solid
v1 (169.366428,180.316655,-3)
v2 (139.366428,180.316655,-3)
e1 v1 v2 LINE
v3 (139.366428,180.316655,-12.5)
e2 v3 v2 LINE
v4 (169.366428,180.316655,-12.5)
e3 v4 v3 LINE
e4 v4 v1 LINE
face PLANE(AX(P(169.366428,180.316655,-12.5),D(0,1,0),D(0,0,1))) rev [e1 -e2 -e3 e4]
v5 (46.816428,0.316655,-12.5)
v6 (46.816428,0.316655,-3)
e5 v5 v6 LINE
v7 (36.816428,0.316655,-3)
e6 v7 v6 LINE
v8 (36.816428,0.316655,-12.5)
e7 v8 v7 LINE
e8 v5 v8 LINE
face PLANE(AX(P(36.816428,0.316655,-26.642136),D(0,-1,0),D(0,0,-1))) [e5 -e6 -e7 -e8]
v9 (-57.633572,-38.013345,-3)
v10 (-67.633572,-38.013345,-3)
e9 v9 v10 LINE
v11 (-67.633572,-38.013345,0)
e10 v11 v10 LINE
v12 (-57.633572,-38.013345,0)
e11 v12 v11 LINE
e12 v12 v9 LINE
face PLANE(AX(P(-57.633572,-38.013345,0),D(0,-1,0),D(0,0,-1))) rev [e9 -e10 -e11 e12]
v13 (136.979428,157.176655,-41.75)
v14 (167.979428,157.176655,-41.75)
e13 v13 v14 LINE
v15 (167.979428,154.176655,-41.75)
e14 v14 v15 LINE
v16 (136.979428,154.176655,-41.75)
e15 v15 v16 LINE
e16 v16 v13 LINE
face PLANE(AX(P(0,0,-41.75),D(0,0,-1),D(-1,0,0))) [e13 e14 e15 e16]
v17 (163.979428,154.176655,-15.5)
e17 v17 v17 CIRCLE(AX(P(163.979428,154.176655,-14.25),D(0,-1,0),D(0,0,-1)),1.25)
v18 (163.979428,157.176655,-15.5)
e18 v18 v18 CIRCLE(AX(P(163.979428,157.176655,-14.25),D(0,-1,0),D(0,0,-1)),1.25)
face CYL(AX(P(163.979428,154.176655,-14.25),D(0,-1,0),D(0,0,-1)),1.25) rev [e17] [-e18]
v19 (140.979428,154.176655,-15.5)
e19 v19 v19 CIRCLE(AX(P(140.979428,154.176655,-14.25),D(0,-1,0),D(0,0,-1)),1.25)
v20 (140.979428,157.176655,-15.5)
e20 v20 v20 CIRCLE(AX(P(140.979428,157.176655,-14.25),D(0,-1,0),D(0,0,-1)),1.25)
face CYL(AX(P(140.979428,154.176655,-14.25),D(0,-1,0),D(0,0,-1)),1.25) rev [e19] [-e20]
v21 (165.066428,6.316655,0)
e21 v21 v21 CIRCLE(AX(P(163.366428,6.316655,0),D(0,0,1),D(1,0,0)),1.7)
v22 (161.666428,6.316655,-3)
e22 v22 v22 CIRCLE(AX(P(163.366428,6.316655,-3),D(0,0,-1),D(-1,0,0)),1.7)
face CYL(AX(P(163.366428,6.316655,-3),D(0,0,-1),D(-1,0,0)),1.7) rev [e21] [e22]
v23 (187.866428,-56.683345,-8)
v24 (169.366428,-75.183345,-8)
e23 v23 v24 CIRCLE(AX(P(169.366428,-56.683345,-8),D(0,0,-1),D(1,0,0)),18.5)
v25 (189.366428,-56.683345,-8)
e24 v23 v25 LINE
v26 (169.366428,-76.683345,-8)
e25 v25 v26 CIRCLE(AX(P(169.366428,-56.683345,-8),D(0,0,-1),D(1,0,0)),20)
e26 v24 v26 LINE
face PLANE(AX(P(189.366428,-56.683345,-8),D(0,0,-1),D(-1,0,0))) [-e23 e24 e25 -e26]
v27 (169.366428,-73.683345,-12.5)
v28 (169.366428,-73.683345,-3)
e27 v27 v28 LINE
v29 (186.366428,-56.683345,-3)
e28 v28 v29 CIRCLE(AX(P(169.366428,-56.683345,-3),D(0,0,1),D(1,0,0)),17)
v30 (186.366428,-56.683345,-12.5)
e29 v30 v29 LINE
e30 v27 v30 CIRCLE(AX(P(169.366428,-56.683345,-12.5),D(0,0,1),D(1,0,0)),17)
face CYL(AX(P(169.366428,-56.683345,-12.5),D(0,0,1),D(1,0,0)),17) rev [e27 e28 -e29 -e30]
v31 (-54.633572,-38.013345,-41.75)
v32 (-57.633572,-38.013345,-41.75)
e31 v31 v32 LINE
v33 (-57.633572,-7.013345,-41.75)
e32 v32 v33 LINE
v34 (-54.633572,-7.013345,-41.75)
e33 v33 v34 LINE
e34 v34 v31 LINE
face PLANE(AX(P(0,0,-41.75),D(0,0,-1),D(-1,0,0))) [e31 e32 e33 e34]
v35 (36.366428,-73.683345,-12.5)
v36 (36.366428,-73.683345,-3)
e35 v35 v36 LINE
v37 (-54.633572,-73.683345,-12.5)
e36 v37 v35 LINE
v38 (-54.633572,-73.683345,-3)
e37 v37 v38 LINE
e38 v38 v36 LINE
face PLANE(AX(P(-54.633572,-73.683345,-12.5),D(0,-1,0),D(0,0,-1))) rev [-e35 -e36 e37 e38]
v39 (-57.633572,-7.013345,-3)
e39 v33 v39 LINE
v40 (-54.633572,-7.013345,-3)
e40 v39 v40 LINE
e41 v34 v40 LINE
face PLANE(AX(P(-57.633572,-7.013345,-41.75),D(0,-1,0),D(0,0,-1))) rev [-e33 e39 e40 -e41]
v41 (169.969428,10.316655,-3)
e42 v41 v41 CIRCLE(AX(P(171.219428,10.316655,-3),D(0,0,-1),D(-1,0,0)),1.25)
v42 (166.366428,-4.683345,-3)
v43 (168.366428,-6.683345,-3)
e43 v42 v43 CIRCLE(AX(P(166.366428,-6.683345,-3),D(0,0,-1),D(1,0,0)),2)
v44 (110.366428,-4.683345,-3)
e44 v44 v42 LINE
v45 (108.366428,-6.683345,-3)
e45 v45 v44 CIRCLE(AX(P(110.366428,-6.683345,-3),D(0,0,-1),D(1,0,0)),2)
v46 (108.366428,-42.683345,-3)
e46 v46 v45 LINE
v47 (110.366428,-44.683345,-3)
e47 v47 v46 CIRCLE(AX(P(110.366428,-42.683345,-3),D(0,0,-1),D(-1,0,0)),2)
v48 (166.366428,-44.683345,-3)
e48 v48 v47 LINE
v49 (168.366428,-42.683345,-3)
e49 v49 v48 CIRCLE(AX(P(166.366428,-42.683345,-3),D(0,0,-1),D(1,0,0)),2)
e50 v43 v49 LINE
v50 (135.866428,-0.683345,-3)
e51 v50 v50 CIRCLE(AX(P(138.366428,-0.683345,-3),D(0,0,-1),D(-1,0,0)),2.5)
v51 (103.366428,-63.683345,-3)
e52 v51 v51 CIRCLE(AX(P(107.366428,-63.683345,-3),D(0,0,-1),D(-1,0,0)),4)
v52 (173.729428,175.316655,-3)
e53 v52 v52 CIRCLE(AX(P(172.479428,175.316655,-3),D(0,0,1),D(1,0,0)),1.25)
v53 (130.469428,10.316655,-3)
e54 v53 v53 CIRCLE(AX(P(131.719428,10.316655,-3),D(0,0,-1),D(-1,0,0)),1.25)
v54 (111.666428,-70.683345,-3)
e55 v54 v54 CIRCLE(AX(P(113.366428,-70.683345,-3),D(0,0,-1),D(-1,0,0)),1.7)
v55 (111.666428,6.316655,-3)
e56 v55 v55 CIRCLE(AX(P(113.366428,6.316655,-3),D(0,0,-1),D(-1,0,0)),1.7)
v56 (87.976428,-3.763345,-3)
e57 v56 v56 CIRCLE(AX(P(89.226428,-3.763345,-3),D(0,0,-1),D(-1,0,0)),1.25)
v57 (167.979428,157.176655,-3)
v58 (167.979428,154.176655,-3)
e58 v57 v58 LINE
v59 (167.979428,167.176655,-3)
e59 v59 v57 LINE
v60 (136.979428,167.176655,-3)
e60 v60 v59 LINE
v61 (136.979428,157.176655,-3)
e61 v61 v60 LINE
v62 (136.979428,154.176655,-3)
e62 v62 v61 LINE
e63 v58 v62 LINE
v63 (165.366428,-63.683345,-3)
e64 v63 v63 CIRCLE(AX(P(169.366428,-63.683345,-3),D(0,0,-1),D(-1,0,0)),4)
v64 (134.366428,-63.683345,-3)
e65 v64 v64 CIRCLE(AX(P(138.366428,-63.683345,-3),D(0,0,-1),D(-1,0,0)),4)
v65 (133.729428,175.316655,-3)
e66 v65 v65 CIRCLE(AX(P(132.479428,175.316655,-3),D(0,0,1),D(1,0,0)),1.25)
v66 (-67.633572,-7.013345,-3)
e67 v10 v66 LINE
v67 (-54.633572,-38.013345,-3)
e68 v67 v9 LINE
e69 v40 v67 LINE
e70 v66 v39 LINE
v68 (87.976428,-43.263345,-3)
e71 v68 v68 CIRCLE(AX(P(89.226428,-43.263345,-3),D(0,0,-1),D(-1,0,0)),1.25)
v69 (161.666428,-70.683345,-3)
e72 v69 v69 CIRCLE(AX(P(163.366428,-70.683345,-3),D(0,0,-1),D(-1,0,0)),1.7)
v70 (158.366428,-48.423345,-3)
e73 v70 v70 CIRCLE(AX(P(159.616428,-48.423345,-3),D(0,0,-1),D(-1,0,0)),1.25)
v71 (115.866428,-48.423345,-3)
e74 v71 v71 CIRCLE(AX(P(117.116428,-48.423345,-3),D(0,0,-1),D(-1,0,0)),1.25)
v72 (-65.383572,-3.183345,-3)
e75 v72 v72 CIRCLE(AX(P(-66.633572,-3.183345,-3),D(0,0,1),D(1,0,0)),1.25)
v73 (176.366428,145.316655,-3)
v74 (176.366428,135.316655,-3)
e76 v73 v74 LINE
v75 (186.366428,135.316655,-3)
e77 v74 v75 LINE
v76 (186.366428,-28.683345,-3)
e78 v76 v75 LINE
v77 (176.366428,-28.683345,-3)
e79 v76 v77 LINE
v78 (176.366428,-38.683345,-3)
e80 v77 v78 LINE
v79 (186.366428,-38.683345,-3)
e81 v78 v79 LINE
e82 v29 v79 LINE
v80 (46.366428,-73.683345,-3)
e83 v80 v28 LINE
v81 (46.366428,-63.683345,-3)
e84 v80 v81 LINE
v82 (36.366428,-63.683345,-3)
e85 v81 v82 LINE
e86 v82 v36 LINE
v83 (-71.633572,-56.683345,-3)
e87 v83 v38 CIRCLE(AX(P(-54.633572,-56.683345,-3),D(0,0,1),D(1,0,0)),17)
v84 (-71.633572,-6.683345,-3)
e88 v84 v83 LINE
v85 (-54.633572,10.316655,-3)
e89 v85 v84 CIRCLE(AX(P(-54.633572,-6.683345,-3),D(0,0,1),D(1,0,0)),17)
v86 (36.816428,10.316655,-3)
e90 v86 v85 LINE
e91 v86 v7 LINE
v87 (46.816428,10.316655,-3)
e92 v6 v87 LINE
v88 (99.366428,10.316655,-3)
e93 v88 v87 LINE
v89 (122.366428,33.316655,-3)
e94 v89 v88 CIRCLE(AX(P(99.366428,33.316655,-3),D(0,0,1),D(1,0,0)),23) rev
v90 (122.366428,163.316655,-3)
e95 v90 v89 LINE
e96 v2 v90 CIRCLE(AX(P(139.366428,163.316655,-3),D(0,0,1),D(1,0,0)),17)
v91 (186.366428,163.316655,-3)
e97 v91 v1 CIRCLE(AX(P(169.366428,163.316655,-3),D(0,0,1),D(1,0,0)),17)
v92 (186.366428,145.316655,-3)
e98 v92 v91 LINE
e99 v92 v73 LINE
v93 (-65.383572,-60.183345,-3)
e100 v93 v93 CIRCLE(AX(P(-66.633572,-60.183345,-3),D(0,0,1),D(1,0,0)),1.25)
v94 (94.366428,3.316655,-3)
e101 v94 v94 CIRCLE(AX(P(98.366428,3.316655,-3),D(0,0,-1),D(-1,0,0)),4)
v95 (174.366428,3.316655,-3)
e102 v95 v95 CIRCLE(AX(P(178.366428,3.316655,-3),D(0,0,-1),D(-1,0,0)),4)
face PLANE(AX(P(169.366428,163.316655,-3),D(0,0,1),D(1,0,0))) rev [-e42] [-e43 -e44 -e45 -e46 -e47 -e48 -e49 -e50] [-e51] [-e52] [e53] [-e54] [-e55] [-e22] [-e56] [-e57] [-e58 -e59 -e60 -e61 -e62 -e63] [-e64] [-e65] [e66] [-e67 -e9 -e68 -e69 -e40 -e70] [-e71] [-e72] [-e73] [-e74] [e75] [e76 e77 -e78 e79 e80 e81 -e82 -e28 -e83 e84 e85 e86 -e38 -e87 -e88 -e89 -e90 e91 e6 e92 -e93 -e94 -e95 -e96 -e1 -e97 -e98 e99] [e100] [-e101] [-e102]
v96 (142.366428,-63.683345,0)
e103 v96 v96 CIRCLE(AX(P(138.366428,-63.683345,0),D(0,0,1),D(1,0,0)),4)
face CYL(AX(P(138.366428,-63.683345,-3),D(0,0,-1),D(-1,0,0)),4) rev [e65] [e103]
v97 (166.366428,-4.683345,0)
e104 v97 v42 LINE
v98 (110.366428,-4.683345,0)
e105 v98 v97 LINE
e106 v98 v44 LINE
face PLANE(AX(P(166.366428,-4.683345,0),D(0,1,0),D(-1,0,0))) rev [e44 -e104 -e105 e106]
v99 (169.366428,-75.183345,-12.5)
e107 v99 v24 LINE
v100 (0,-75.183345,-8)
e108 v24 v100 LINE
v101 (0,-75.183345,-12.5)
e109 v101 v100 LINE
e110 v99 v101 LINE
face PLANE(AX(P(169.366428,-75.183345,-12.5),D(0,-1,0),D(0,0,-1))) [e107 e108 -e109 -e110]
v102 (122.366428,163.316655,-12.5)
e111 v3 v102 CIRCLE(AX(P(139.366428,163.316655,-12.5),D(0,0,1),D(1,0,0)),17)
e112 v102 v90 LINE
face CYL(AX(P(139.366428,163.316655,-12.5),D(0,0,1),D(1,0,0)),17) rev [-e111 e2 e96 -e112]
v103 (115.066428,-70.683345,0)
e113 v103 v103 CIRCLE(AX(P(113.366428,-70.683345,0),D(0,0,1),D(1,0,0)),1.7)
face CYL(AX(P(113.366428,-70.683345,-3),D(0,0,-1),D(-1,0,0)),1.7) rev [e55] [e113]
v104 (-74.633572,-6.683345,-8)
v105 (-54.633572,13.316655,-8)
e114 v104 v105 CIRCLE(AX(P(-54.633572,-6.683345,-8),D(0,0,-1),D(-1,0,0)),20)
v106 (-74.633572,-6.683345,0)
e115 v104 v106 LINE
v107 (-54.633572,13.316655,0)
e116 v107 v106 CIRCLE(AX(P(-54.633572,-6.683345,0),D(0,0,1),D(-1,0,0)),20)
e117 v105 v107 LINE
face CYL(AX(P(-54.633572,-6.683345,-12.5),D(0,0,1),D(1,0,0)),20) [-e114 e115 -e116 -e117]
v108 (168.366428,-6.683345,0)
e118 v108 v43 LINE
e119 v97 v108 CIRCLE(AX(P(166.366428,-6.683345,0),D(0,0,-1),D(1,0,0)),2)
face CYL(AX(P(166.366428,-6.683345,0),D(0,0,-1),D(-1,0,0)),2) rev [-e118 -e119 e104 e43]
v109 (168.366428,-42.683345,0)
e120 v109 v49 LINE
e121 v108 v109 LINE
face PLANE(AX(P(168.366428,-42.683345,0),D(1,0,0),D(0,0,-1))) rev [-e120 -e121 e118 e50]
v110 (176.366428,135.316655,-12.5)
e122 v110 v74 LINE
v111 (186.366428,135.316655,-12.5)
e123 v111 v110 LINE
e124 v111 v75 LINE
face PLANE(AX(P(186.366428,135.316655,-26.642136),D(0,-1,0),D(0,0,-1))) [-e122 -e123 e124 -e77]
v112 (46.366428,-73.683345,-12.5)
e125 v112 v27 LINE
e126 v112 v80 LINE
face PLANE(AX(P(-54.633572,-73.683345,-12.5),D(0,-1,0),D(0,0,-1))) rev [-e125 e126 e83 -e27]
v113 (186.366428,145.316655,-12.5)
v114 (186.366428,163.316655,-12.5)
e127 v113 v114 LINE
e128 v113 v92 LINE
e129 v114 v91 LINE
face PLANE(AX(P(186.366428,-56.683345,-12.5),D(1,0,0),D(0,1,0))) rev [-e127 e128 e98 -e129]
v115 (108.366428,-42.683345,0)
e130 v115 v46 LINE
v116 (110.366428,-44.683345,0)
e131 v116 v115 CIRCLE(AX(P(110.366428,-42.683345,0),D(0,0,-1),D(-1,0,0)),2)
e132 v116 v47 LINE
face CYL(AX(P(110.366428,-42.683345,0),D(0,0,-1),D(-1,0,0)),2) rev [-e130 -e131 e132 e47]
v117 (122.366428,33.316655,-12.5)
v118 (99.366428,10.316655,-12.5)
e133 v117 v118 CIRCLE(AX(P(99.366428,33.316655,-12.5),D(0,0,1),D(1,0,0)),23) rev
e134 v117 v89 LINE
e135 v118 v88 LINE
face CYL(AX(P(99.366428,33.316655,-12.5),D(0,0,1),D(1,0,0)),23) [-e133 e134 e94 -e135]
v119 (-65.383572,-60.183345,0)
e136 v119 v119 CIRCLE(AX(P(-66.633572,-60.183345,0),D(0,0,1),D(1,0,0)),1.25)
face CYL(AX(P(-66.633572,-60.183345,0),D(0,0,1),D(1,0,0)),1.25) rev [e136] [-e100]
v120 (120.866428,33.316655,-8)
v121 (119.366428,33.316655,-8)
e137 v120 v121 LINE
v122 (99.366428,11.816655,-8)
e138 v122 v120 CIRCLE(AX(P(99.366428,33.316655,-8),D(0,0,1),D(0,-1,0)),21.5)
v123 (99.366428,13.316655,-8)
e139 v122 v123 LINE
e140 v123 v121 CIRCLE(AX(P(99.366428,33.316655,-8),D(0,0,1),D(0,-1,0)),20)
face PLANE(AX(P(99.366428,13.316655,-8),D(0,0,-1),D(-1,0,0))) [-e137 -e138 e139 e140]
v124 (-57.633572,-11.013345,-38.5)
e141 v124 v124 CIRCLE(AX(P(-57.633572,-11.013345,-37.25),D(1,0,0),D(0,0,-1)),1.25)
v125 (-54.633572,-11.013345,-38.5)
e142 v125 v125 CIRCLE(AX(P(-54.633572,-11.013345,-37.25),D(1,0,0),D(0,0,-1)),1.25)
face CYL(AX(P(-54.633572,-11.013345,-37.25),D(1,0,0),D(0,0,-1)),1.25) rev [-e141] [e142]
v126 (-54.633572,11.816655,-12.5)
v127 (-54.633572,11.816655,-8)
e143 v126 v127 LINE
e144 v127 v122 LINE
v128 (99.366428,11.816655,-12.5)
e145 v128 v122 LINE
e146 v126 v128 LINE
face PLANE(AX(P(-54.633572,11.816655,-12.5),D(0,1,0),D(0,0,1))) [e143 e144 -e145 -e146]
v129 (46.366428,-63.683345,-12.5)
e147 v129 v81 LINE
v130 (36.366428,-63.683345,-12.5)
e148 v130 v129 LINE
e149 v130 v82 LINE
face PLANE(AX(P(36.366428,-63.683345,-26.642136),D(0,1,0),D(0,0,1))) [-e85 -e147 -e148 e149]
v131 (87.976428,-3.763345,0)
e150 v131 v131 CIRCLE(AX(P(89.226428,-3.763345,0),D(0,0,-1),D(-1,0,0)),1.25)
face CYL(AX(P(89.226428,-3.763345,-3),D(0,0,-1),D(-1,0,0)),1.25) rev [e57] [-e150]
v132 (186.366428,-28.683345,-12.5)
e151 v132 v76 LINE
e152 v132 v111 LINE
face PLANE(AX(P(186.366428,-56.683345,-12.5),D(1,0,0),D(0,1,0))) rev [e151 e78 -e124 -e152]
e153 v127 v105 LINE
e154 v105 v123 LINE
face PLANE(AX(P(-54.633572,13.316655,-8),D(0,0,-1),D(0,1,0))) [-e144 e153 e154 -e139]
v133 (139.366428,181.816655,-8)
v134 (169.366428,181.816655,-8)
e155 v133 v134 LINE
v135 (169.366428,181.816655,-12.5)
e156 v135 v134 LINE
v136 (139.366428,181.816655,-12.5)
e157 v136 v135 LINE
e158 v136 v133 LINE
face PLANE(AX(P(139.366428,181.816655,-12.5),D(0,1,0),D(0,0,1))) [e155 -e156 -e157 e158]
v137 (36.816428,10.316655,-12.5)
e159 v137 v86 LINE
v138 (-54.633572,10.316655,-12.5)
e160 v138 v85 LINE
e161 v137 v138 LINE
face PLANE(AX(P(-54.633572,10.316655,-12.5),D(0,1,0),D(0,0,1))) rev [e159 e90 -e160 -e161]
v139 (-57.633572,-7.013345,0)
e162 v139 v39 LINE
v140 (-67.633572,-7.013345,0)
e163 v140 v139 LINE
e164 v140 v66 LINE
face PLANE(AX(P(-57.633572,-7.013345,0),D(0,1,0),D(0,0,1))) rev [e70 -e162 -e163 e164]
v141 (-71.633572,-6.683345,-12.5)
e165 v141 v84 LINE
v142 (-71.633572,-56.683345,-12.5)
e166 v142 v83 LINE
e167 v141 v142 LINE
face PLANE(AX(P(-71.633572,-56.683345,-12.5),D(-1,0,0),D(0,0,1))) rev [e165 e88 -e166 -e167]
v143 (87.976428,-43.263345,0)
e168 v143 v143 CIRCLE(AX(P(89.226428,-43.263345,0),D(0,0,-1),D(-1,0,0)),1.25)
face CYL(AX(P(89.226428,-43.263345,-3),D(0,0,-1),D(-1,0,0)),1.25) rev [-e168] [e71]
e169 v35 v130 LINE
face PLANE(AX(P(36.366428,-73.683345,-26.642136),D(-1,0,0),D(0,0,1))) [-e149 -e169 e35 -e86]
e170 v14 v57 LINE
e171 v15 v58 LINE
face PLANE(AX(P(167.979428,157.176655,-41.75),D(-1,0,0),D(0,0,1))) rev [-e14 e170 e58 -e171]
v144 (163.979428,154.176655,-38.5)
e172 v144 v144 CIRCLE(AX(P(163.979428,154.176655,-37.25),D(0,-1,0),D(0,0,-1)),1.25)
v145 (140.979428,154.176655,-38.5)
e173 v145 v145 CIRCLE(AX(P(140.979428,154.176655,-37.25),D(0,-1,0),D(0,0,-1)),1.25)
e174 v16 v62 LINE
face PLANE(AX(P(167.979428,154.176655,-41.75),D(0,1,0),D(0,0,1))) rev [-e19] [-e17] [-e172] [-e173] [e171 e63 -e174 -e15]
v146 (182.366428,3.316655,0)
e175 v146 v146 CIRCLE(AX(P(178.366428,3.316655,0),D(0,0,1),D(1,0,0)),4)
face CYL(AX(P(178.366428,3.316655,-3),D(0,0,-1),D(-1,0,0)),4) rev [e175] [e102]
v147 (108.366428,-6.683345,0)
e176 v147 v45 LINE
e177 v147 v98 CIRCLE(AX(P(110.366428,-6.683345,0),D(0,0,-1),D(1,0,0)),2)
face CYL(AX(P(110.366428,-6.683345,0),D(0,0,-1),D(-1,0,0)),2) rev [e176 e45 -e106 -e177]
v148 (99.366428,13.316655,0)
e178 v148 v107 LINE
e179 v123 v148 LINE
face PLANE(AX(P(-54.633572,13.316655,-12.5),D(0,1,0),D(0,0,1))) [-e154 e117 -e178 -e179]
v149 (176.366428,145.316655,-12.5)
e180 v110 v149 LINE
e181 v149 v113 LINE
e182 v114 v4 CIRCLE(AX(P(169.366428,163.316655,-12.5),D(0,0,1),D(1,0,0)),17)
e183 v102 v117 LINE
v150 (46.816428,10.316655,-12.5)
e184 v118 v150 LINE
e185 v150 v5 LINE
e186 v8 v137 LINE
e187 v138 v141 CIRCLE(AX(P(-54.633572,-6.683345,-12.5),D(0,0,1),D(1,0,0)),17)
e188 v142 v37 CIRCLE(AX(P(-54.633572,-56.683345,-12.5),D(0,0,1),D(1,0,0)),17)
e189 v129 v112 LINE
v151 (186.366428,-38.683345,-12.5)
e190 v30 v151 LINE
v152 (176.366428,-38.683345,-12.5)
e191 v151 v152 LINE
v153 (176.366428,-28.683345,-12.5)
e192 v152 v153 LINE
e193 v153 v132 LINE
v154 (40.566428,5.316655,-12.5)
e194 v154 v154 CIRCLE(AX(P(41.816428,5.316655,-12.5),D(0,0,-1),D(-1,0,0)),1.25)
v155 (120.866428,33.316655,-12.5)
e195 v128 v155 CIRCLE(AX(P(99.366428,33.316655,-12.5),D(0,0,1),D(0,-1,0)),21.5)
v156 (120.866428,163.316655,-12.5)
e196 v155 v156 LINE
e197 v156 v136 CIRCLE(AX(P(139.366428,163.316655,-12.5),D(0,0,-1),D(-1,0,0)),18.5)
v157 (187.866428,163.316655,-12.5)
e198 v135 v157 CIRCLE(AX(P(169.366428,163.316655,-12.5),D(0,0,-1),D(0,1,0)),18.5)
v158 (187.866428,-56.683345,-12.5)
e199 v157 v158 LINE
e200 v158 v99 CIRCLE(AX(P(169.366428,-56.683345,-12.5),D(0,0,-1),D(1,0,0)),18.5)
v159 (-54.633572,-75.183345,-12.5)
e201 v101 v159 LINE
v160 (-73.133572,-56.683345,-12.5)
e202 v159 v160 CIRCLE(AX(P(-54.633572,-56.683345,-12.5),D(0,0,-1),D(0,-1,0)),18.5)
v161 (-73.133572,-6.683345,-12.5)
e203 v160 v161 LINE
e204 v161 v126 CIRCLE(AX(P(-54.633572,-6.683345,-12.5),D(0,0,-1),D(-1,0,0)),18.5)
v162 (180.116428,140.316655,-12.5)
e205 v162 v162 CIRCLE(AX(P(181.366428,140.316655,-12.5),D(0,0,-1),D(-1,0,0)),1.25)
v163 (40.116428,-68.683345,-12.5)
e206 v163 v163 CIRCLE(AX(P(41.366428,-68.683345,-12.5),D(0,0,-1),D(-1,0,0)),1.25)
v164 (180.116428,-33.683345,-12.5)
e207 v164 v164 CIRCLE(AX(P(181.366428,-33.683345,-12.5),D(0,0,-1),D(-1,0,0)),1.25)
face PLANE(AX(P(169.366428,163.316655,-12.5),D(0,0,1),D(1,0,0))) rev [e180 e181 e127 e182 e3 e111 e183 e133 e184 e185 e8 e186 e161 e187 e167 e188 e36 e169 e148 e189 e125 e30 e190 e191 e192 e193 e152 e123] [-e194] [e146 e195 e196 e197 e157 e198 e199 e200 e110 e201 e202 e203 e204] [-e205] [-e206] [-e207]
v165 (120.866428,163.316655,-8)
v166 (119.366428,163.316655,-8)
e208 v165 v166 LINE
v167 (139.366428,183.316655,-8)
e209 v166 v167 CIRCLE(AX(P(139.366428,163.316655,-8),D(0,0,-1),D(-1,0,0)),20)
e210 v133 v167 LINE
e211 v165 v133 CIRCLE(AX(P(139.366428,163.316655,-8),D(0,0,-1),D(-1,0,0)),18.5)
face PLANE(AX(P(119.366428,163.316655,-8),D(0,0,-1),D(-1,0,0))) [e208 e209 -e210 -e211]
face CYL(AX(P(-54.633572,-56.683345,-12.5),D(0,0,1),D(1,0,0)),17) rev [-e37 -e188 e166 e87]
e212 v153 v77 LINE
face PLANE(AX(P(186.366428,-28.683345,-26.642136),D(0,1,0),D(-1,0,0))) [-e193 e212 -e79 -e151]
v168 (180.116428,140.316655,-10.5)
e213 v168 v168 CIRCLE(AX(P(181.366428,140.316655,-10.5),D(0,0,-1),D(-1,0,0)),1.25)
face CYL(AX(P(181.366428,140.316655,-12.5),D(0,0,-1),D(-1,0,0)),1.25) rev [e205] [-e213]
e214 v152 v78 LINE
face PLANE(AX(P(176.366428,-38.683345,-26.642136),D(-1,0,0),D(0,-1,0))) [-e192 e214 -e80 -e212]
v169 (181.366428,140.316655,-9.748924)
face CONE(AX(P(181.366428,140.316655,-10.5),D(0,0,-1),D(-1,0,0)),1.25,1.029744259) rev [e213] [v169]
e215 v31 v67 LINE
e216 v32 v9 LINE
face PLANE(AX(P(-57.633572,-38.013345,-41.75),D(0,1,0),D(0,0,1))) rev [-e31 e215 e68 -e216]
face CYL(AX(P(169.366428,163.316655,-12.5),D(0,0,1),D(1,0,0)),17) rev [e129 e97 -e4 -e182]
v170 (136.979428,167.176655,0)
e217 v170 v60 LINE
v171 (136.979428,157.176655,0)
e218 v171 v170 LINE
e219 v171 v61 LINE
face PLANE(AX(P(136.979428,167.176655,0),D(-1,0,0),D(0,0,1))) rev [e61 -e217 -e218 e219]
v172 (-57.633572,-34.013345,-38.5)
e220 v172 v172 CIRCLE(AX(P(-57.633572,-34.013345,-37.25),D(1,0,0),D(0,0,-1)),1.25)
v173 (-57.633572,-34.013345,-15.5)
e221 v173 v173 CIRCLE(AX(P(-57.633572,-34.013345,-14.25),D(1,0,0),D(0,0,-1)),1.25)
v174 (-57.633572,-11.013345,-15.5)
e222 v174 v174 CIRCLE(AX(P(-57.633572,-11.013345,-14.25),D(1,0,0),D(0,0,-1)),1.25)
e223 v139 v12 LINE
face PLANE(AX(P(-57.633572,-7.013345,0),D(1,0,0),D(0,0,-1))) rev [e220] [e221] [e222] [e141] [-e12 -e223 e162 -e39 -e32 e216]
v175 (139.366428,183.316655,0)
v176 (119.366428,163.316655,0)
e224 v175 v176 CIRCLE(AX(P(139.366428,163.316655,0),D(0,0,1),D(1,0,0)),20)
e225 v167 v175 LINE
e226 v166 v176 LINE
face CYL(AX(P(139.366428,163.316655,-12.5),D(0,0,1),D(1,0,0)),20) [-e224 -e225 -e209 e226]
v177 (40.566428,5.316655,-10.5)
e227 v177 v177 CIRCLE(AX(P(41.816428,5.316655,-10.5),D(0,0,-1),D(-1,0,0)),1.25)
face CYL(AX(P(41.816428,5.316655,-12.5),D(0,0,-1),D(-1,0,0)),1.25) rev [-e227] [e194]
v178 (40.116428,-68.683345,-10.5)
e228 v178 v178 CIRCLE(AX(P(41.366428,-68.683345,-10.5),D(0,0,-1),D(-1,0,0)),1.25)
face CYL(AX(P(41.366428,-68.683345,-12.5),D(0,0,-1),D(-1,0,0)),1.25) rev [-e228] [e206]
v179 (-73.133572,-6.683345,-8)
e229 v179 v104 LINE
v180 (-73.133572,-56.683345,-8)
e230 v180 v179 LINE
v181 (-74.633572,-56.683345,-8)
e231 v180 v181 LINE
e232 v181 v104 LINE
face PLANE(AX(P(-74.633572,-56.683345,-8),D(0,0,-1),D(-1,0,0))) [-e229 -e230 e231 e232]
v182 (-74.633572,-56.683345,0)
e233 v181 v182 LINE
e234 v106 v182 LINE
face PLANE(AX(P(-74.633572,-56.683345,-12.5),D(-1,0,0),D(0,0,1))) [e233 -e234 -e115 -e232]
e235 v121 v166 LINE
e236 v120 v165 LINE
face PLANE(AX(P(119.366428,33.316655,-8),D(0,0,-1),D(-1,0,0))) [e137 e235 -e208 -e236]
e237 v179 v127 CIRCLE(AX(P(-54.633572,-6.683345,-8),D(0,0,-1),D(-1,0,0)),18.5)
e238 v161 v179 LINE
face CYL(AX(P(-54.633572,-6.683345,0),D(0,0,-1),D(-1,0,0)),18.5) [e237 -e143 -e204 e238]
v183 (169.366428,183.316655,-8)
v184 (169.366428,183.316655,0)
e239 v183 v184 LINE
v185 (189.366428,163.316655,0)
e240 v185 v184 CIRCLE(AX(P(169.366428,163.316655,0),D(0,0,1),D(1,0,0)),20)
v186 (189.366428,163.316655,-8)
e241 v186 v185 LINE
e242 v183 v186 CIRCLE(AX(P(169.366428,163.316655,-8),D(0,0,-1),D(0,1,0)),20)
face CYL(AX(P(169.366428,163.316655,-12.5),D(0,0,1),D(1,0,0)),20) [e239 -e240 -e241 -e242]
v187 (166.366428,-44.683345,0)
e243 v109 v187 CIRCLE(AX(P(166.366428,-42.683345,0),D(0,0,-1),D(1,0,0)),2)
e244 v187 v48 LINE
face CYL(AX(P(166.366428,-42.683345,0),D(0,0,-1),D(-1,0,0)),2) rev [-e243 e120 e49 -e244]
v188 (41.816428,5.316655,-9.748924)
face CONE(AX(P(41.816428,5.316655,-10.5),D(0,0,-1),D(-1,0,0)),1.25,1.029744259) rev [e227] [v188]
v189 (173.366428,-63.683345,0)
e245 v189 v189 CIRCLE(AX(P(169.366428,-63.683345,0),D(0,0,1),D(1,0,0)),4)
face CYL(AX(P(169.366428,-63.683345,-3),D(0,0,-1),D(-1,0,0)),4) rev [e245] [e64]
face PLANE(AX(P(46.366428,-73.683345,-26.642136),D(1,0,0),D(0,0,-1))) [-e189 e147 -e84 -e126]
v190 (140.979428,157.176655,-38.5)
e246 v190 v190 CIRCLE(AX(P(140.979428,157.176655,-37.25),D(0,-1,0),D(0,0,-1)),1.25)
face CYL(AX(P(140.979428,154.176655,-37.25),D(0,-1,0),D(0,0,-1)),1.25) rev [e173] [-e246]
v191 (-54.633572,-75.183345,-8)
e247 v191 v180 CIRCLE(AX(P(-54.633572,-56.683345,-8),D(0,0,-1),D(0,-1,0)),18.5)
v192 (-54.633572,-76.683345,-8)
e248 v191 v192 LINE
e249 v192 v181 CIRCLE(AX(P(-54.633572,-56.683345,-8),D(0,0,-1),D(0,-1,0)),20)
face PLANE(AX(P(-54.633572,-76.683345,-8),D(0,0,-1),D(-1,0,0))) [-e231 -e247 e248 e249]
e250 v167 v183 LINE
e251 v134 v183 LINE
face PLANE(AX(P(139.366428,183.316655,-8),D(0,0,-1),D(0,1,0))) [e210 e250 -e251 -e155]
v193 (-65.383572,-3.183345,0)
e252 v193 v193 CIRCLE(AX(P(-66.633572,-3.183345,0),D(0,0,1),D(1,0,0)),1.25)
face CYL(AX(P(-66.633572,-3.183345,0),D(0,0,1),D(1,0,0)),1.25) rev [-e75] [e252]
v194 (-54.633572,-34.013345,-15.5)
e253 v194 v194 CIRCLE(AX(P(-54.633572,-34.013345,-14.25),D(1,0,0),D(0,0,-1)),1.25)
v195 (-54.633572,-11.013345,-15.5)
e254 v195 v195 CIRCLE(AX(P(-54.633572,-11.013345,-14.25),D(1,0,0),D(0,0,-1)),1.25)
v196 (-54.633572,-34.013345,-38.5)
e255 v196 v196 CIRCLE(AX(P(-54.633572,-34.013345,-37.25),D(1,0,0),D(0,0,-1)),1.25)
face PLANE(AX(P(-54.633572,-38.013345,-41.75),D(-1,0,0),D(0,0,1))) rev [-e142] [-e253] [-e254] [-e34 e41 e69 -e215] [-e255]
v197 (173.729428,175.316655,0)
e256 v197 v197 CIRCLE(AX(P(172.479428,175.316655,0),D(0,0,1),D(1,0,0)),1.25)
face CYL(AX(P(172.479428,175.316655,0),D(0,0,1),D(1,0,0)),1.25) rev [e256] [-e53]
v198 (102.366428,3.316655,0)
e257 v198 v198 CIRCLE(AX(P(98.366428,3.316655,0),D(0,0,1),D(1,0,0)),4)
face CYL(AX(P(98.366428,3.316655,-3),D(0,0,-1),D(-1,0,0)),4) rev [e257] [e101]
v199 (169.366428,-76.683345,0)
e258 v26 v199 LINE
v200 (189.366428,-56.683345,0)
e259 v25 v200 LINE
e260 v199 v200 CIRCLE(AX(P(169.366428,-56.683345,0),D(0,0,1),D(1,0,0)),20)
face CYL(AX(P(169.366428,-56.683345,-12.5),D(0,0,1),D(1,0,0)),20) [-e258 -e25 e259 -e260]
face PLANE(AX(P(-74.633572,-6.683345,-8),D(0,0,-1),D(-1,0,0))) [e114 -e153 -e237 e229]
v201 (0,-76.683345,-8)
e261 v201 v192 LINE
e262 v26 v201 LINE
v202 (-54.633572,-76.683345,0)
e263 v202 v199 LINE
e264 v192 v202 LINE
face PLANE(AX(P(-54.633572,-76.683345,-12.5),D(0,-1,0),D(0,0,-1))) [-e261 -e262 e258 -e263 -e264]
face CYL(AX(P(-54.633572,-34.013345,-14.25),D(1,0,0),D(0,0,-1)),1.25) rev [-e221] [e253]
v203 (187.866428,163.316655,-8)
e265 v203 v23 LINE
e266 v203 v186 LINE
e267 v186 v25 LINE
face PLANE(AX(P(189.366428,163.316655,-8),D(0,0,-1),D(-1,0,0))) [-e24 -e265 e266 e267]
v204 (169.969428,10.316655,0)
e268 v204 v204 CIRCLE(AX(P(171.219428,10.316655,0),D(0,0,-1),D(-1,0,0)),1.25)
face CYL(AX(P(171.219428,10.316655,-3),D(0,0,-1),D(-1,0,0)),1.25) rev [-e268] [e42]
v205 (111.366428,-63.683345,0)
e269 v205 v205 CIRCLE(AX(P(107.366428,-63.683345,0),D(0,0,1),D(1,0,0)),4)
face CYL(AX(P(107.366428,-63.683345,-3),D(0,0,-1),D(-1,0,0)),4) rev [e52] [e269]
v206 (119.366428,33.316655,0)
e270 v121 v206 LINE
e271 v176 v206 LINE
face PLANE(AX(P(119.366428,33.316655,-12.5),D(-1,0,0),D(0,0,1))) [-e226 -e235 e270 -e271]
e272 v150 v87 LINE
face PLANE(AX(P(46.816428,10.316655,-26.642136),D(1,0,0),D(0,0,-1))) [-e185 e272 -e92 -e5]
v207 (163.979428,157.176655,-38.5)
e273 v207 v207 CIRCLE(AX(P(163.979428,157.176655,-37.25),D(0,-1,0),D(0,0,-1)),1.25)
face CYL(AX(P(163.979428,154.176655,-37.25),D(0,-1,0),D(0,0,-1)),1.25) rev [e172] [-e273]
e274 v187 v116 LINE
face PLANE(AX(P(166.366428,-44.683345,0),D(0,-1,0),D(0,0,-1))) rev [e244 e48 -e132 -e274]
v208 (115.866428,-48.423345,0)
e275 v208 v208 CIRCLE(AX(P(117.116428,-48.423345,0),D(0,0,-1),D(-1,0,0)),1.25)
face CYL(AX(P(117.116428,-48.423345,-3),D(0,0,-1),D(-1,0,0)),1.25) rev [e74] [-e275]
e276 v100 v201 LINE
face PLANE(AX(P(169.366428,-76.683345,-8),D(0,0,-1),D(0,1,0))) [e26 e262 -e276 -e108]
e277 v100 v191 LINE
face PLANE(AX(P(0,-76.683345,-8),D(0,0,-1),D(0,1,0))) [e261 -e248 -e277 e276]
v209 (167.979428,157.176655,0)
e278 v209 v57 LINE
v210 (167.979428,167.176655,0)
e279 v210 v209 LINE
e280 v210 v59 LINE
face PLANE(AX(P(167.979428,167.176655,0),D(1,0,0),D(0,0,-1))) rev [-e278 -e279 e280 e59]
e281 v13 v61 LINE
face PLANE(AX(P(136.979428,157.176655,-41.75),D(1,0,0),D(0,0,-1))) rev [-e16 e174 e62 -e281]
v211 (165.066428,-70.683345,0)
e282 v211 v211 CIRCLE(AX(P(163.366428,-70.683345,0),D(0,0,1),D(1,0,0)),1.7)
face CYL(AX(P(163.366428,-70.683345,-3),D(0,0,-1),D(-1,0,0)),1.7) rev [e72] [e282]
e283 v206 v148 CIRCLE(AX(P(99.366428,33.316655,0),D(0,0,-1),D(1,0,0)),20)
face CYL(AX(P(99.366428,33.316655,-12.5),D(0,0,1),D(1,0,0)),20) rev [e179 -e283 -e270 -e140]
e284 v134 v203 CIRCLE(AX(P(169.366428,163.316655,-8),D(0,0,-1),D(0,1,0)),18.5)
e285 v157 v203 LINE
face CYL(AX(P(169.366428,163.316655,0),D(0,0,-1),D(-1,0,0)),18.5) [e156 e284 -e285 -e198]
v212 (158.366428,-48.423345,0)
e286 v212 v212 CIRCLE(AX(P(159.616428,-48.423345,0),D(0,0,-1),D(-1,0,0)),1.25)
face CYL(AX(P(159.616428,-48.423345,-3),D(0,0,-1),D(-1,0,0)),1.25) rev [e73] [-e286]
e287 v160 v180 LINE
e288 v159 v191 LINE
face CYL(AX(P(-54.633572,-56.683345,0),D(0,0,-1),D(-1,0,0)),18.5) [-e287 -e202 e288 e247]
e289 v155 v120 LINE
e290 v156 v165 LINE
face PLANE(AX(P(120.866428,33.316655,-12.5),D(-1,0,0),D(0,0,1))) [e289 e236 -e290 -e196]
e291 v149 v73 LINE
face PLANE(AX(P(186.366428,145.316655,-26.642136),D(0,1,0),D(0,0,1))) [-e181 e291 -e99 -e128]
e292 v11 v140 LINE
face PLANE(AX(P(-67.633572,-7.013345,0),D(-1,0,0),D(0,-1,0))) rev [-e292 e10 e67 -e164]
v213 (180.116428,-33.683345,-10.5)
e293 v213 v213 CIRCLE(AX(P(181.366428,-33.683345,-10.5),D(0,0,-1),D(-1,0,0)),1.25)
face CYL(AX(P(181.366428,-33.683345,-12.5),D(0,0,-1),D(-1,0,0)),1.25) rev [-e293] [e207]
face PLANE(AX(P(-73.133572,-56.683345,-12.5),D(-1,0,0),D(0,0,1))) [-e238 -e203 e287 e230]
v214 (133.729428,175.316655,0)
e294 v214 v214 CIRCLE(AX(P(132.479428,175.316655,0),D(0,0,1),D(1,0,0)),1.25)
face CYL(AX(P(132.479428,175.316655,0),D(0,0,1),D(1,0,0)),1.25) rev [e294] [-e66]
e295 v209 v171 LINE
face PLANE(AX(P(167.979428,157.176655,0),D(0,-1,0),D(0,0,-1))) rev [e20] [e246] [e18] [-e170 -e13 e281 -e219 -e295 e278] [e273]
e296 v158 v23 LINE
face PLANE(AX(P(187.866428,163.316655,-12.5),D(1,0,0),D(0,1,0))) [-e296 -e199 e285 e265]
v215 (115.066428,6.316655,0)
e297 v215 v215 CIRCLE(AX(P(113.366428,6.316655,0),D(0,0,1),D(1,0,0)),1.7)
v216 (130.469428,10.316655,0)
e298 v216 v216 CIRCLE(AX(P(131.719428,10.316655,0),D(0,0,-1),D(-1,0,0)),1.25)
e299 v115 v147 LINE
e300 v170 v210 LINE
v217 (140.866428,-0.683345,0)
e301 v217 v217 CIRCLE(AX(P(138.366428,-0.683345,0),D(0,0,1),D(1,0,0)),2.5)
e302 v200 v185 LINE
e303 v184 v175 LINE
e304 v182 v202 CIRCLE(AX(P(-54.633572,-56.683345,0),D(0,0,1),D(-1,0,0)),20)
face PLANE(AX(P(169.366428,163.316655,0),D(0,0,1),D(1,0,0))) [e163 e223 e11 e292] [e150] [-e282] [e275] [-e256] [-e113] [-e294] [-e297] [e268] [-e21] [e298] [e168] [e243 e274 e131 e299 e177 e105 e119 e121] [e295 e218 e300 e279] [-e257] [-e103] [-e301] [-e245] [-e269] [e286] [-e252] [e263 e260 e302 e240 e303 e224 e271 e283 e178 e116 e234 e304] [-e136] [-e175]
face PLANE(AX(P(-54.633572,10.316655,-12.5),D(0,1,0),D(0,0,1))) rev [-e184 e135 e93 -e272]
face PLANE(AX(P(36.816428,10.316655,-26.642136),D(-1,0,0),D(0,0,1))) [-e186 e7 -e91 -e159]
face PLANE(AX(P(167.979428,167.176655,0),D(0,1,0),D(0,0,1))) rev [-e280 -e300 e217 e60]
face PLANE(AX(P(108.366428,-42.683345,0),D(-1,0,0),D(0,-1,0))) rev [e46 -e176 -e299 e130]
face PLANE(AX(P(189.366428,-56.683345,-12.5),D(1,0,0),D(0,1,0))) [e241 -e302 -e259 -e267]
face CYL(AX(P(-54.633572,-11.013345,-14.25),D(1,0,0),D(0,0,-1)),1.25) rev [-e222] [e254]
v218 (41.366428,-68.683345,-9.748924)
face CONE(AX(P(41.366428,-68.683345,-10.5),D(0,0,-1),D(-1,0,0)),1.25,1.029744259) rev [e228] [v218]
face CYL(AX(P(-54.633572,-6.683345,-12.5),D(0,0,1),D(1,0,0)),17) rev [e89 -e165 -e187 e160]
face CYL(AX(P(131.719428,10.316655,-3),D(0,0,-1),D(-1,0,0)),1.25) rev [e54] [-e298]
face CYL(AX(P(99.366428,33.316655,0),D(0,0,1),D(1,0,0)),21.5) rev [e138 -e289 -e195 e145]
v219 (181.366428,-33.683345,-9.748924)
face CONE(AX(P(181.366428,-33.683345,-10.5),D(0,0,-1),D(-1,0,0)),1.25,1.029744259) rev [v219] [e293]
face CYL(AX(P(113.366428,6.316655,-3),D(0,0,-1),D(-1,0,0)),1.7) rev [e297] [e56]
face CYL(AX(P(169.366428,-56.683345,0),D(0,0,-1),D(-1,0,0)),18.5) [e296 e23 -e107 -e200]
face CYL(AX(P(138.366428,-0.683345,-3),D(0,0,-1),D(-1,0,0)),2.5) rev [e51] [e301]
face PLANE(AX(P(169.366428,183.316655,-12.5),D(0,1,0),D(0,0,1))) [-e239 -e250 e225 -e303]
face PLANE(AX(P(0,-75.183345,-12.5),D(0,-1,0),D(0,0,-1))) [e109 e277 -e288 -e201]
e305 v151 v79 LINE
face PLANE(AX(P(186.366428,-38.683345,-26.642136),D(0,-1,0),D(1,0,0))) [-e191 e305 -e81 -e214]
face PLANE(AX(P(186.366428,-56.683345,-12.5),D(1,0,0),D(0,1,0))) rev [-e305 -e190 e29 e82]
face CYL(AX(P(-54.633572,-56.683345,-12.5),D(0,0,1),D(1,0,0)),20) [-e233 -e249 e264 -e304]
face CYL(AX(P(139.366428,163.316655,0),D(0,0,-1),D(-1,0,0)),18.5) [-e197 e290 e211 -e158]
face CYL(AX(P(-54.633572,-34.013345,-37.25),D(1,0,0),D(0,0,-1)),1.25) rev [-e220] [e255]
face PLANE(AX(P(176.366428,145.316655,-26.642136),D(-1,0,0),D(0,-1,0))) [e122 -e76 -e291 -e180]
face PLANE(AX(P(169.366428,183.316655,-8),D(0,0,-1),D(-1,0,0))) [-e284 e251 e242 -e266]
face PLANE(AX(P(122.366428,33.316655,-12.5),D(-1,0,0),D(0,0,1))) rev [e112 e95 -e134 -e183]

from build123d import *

# Parameters (mm, degrees)
BOX_EXTRUDE_DEPTH                 = 12.5
SHELL1_T                          = -3
CUT_SWEEP_START                   = -12.5
CUT_SWEEP_DEPTH                   = 4.5
SKETCH2_W                         = 10
SKETCH2_H                         = 10
SQUARES_EXTRUDE_DEPTH             = 9.5
SKETCH11_W                        = 10
SKETCH11_H                        = 31
SKETCH11_W_2                      = 31
SKETCH11_H_2                      = 10
CUT_EXTRUDE2_DEPTH                = 264.732611064
SQUARES_M3_CLEARANCE_HOLES_D      = 2.5
SQUARES_M3_CLEARANCE_HOLES_DEPTH  = 2
SQUARES_M3_CLEARANCE_HOLES_TIP    = 0.751075774
F_8_0MM_DOWEL_HOLE1_D             = 8
F_8_0MM_DOWEL_HOLE1_DEPTH         = 7.5
F_8_0MM_DOWEL_HOLE1_TIP           = 2.403442476
F_5_0MM_DOWEL_HOLE1_D             = 5
F_5_0MM_DOWEL_HOLE1_DEPTH         = 7.5
F_5_0MM_DOWEL_HOLE1_TIP           = 1.502151548
M3_CLEARANCE_HOLE3_D              = 3.4
M3_CLEARANCE_HOLE3_DEPTH          = 7.5
M3_CLEARANCE_HOLE3_TIP            = 1.021463052
M3X0_5_TAPPED_HOLE1_D             = 2.5
M3X0_5_TAPPED_HOLE2_D             = 2.5
M3X0_5_TAPPED_HOLE2_DEPTH         = 7.5
M3X0_5_TAPPED_HOLE2_TIP           = 0.751075774
SKETCH25_W                        = 3
SKETCH25_H                        = 31
SKETCH25_W_2                      = 31
SKETCH25_H_2                      = 3
DRIVER_BOARD_HOLDER_EXTRUDE_DEPTH = 38.75
F_2_5MM_DOWEL_HOLE1_D             = 2.5
F_2_5MM_DOWEL_HOLE1_ON_FACE_2_D   = 2.5


# Read off the part's stored shape, not the designer's step: Cut-Sweep
with BuildPart() as part:
    # Sketch1 → Box-Extrude (new body)
    with BuildSketch(Plane.XY):
        with BuildLine():
            Line((-54.633571826, -76.683344949), (169.366428174, -76.683344949))
            ThreePointArc((169.366428174, -76.683344949), (183.508563798, -70.825480573), (189.366428174, -56.683344949))
            Line((189.366428174, -56.683344949), (189.366428174, 163.316655051))
            ThreePointArc((189.366428174, 163.316655051), (183.508563798, 177.458790675), (169.366428174, 183.316655051))
            Line((169.366428174, 183.316655051), (139.366428174, 183.316655051))
            ThreePointArc((139.366428174, 183.316655051), (125.22429255, 177.458790675), (119.366428174, 163.316655051))
            Line((119.366428174, 163.316655051), (119.366428174, 33.316655051))
            ThreePointArc((119.366428174, 33.316655051), (113.508563798, 19.174519427), (99.366428174, 13.316655051))
            Line((99.366428174, 13.316655051), (-54.633571826, 13.316655051))
            ThreePointArc((-54.633571826, 13.316655051), (-68.77570745, 7.458790675), (-74.633571826, -6.683344949))
            Line((-74.633571826, -6.683344949), (-74.633571826, -56.683344949))
            ThreePointArc((-74.633571826, -56.683344949), (-68.77570745, -70.825480573), (-54.633571826, -76.683344949))
        make_face()
    extrude(amount=-BOX_EXTRUDE_DEPTH)

    # Shell1
    shell1_openings = [part.faces().sort_by_distance(p)[0] for p in [
        (90.029023859, 11.315684384, -12.5),
    ]]
    offset(amount=SHELL1_T, openings=shell1_openings, kind=Kind.INTERSECTION)

    # Cut-Sweep outline → Cut-Sweep (cut)
    with BuildSketch(Plane.XY.offset(CUT_SWEEP_START)):
        with BuildLine():
            Line((189.366428174, -56.683344949), (189.366428174, 163.316655051))
            ThreePointArc((189.366428174, 163.316655051), (183.508563798, 177.458790675), (169.366428174, 183.316655051))
            Line((169.366428174, 183.316655051), (139.366428174, 183.316655051))
            ThreePointArc((139.366428174, 183.316655051), (125.22429255, 177.458790675), (119.366428174, 163.316655051))
            Line((119.366428174, 163.316655051), (119.366428174, 33.316655051))
            ThreePointArc((119.366428174, 33.316655051), (113.508563798, 19.174519427), (99.366428174, 13.316655051))
            Line((99.366428174, 13.316655051), (-54.633571826, 13.316655051))
            ThreePointArc((-54.633571826, 13.316655051), (-68.77570745, 7.458790675), (-74.633571826, -6.683344949))
            Line((-74.633571826, -6.683344949), (-74.633571826, -56.683344949))
            ThreePointArc((-74.633571826, -56.683344949), (-68.77570745, -70.825480573), (-54.633571826, -76.683344949))
            Line((-54.633571826, -76.683344949), (169.366428174, -76.683344949))
            ThreePointArc((169.366428174, -76.683344949), (183.508563798, -70.825480573), (189.366428174, -56.683344949))
        make_face()
        with BuildLine():
            Line((169.366428174, -75.183344949), (-54.633571826, -75.183344949))
            ThreePointArc((-54.633571826, -75.183344949), (-67.715047278, -69.764820401), (-73.133571826, -56.683344949))
            Line((-73.133571826, -56.683344949), (-73.133571826, -6.683344949))
            ThreePointArc((-73.133571826, -6.683344949), (-67.715047278, 6.398130503), (-54.633571826, 11.816655051))
            Line((-54.633571826, 11.816655051), (99.366428174, 11.816655051))
            ThreePointArc((99.366428174, 11.816655051), (114.569223969, 18.113859256), (120.866428174, 33.316655051))
            Line((120.866428174, 33.316655051), (120.866428174, 163.316655051))
            ThreePointArc((120.866428174, 163.316655051), (126.284952722, 176.398130503), (139.366428174, 181.816655051))
            Line((139.366428174, 181.816655051), (169.366428174, 181.816655051))
            ThreePointArc((169.366428174, 181.816655051), (182.447903626, 176.398130503), (187.866428174, 163.316655051))
            Line((187.866428174, 163.316655051), (187.866428174, -56.683344949))
            ThreePointArc((187.866428174, -56.683344949), (182.447903626, -69.764820401), (169.366428174, -75.183344949))
        make_face(mode=Mode.SUBTRACT)
    extrude(amount=CUT_SWEEP_DEPTH, mode=Mode.SUBTRACT)

    # Sketch2 → Squares-Extrude (add)
    with BuildSketch(Plane.XY.offset(-3)):
        with Locations((41.816428174, 5.316655051)):
            Rectangle(SKETCH2_W, SKETCH2_H)
        with Locations((181.366428174, -33.683344949)):
            Rectangle(SKETCH2_W, SKETCH2_H)
        with Locations((41.366428174, -68.683344949)):
            Rectangle(SKETCH2_W, SKETCH2_H)
        with Locations((181.366428174, 140.316655051)):
            Rectangle(SKETCH2_W, SKETCH2_H)
    extrude(amount=-SQUARES_EXTRUDE_DEPTH)

    # Sketch11 → Cut-Extrude2 (cut, through all)
    with BuildSketch(Plane(origin=(0, 0, -3), x_dir=(-1, 0, 0), z_dir=(0, 0, -1))):
        with BuildLine():
            Line((-166.366428174, -44.683344949), (-110.366428174, -44.683344949))
            ThreePointArc((-110.366428174, -44.683344949), (-108.952214612, -44.097558511), (-108.366428174, -42.683344949))
            Line((-108.366428174, -42.683344949), (-108.366428174, -6.683344949))
            ThreePointArc((-108.366428174, -6.683344949), (-108.952214612, -5.269131386), (-110.366428174, -4.683344949))
            Line((-110.366428174, -4.683344949), (-166.366428174, -4.683344949))
            ThreePointArc((-166.366428174, -4.683344949), (-167.780641736, -5.269131386), (-168.366428174, -6.683344949))
            Line((-168.366428174, -6.683344949), (-168.366428174, -42.683344949))
            ThreePointArc((-168.366428174, -42.683344949), (-167.780641736, -44.097558511), (-166.366428174, -44.683344949))
        make_face()
        with Locations((62.633571826, -22.513344949)):
            Rectangle(SKETCH11_W, SKETCH11_H)
        with Locations((-152.479428174, 162.176655051)):
            Rectangle(SKETCH11_W_2, SKETCH11_H_2)
    extrude(amount=-CUT_EXTRUDE2_DEPTH, mode=Mode.SUBTRACT)

    # Squares M3 Clearance Holes
    with Locations(Plane(origin=(0, 0, -12.5), x_dir=(1, 0, 0), z_dir=(0, 0, -1))):
        with Locations((41.816428174, -5.316655051), (181.366428174, -140.316655051), (181.366428174, 33.683344949), (41.366428174, 68.683344949)):
            Hole(SQUARES_M3_CLEARANCE_HOLES_D / 2, depth=SQUARES_M3_CLEARANCE_HOLES_DEPTH)
            with Locations((0, 0, -(SQUARES_M3_CLEARANCE_HOLES_DEPTH + SQUARES_M3_CLEARANCE_HOLES_TIP / 2))):  # 118° drill point
                Cone(0, SQUARES_M3_CLEARANCE_HOLES_D / 2, SQUARES_M3_CLEARANCE_HOLES_TIP, mode=Mode.SUBTRACT)

    # Ø8.0mm Dowel Hole1
    with Locations(Plane(origin=(169.366428174, -63.683344949, -3), x_dir=(-1, 0, 0), z_dir=(0, 0, -1))):
        with Locations((0, 0), (31, 0), (62, 0), (71, 67), (-9, 67)):
            Hole(F_8_0MM_DOWEL_HOLE1_D / 2, depth=F_8_0MM_DOWEL_HOLE1_DEPTH)
            with Locations((0, 0, -(F_8_0MM_DOWEL_HOLE1_DEPTH + F_8_0MM_DOWEL_HOLE1_TIP / 2))):  # 118° drill point
                Cone(0, F_8_0MM_DOWEL_HOLE1_D / 2, F_8_0MM_DOWEL_HOLE1_TIP, mode=Mode.SUBTRACT)

    # Ø5.0mm Dowel Hole1
    with Locations(Plane(origin=(0, 0, -3), x_dir=(-1, 0, 0), z_dir=(0, 0, -1))):
        with Locations((-138.366428174, -0.683344949)):
            Hole(F_5_0MM_DOWEL_HOLE1_D / 2, depth=F_5_0MM_DOWEL_HOLE1_DEPTH)
            with Locations((0, 0, -(F_5_0MM_DOWEL_HOLE1_DEPTH + F_5_0MM_DOWEL_HOLE1_TIP / 2))):  # 118° drill point
                Cone(0, F_5_0MM_DOWEL_HOLE1_D / 2, F_5_0MM_DOWEL_HOLE1_TIP, mode=Mode.SUBTRACT)

    # M3 Clearance Hole3
    with Locations(Plane(origin=(0, 0, -3), x_dir=(-1, 0, 0), z_dir=(0, 0, -1))):
        with Locations((-163.366428174, 6.316655051), (-113.366428174, 6.316655051), (-163.366428174, -70.683344949), (-113.366428174, -70.683344949)):
            Hole(M3_CLEARANCE_HOLE3_D / 2, depth=M3_CLEARANCE_HOLE3_DEPTH)
            with Locations((0, 0, -(M3_CLEARANCE_HOLE3_DEPTH + M3_CLEARANCE_HOLE3_TIP / 2))):  # 118° drill point
                Cone(0, M3_CLEARANCE_HOLE3_D / 2, M3_CLEARANCE_HOLE3_TIP, mode=Mode.SUBTRACT)

    # M3x0.5 Tapped Hole1 (through all)
    with Locations(Plane(origin=(0, 0, -3), x_dir=(-1, 0, 0), z_dir=(0, 0, -1))):
        with Locations((-117.116428174, -48.423344949), (-159.616428174, -48.423344949), (-89.226428174, -3.763344949), (-89.226428174, -43.263344949), (-171.219428174, 10.316655051), (-131.719428174, 10.316655051)):
            Hole(M3X0_5_TAPPED_HOLE1_D / 2)

    # M3x0.5 Tapped Hole2
    with Locations(Plane.XY):
        with Locations((-66.633571826, -3.183344949), (-66.633571826, -60.183344949), (172.479428174, 175.316655051), (132.479428174, 175.316655051)):
            Hole(M3X0_5_TAPPED_HOLE2_D / 2, depth=M3X0_5_TAPPED_HOLE2_DEPTH)
            with Locations((0, 0, -(M3X0_5_TAPPED_HOLE2_DEPTH + M3X0_5_TAPPED_HOLE2_TIP / 2))):  # 118° drill point
                Cone(0, M3X0_5_TAPPED_HOLE2_D / 2, M3X0_5_TAPPED_HOLE2_TIP, mode=Mode.SUBTRACT)

    # Sketch25 → Driver Board holder Extrude (add)
    with BuildSketch(Plane(origin=(0, 0, -3), x_dir=(-1, 0, 0), z_dir=(0, 0, -1))):
        with Locations((56.133571826, -22.513344949)):
            Rectangle(SKETCH25_W, SKETCH25_H)
        with Locations((-152.479428174, 155.676655051)):
            Rectangle(SKETCH25_W_2, SKETCH25_H_2)
    extrude(amount=DRIVER_BOARD_HOLDER_EXTRUDE_DEPTH)

    # Ø2.5mm Dowel Hole1 (through all)
    with Locations(Plane(origin=(163.979428174, 154.176655051, -37.25), x_dir=(0, 0, -1), z_dir=(0, -1, 0))):
        with Locations((0, 0), (0, -23), (-23, 0), (-23, -23)):
            Hole(F_2_5MM_DOWEL_HOLE1_D / 2)

    # Ø2.5mm Dowel Hole1 on face 2 (through all)
    with Locations(Plane(origin=(-54.633571826, -11.013344949, -37.25), x_dir=(0, 0, 1), z_dir=(1, 0, 0))):
        with Locations((0, 0), (0, 23), (23, 23), (23, 0)):
            Hole(F_2_5MM_DOWEL_HOLE1_ON_FACE_2_D / 2)


solid = part.part
